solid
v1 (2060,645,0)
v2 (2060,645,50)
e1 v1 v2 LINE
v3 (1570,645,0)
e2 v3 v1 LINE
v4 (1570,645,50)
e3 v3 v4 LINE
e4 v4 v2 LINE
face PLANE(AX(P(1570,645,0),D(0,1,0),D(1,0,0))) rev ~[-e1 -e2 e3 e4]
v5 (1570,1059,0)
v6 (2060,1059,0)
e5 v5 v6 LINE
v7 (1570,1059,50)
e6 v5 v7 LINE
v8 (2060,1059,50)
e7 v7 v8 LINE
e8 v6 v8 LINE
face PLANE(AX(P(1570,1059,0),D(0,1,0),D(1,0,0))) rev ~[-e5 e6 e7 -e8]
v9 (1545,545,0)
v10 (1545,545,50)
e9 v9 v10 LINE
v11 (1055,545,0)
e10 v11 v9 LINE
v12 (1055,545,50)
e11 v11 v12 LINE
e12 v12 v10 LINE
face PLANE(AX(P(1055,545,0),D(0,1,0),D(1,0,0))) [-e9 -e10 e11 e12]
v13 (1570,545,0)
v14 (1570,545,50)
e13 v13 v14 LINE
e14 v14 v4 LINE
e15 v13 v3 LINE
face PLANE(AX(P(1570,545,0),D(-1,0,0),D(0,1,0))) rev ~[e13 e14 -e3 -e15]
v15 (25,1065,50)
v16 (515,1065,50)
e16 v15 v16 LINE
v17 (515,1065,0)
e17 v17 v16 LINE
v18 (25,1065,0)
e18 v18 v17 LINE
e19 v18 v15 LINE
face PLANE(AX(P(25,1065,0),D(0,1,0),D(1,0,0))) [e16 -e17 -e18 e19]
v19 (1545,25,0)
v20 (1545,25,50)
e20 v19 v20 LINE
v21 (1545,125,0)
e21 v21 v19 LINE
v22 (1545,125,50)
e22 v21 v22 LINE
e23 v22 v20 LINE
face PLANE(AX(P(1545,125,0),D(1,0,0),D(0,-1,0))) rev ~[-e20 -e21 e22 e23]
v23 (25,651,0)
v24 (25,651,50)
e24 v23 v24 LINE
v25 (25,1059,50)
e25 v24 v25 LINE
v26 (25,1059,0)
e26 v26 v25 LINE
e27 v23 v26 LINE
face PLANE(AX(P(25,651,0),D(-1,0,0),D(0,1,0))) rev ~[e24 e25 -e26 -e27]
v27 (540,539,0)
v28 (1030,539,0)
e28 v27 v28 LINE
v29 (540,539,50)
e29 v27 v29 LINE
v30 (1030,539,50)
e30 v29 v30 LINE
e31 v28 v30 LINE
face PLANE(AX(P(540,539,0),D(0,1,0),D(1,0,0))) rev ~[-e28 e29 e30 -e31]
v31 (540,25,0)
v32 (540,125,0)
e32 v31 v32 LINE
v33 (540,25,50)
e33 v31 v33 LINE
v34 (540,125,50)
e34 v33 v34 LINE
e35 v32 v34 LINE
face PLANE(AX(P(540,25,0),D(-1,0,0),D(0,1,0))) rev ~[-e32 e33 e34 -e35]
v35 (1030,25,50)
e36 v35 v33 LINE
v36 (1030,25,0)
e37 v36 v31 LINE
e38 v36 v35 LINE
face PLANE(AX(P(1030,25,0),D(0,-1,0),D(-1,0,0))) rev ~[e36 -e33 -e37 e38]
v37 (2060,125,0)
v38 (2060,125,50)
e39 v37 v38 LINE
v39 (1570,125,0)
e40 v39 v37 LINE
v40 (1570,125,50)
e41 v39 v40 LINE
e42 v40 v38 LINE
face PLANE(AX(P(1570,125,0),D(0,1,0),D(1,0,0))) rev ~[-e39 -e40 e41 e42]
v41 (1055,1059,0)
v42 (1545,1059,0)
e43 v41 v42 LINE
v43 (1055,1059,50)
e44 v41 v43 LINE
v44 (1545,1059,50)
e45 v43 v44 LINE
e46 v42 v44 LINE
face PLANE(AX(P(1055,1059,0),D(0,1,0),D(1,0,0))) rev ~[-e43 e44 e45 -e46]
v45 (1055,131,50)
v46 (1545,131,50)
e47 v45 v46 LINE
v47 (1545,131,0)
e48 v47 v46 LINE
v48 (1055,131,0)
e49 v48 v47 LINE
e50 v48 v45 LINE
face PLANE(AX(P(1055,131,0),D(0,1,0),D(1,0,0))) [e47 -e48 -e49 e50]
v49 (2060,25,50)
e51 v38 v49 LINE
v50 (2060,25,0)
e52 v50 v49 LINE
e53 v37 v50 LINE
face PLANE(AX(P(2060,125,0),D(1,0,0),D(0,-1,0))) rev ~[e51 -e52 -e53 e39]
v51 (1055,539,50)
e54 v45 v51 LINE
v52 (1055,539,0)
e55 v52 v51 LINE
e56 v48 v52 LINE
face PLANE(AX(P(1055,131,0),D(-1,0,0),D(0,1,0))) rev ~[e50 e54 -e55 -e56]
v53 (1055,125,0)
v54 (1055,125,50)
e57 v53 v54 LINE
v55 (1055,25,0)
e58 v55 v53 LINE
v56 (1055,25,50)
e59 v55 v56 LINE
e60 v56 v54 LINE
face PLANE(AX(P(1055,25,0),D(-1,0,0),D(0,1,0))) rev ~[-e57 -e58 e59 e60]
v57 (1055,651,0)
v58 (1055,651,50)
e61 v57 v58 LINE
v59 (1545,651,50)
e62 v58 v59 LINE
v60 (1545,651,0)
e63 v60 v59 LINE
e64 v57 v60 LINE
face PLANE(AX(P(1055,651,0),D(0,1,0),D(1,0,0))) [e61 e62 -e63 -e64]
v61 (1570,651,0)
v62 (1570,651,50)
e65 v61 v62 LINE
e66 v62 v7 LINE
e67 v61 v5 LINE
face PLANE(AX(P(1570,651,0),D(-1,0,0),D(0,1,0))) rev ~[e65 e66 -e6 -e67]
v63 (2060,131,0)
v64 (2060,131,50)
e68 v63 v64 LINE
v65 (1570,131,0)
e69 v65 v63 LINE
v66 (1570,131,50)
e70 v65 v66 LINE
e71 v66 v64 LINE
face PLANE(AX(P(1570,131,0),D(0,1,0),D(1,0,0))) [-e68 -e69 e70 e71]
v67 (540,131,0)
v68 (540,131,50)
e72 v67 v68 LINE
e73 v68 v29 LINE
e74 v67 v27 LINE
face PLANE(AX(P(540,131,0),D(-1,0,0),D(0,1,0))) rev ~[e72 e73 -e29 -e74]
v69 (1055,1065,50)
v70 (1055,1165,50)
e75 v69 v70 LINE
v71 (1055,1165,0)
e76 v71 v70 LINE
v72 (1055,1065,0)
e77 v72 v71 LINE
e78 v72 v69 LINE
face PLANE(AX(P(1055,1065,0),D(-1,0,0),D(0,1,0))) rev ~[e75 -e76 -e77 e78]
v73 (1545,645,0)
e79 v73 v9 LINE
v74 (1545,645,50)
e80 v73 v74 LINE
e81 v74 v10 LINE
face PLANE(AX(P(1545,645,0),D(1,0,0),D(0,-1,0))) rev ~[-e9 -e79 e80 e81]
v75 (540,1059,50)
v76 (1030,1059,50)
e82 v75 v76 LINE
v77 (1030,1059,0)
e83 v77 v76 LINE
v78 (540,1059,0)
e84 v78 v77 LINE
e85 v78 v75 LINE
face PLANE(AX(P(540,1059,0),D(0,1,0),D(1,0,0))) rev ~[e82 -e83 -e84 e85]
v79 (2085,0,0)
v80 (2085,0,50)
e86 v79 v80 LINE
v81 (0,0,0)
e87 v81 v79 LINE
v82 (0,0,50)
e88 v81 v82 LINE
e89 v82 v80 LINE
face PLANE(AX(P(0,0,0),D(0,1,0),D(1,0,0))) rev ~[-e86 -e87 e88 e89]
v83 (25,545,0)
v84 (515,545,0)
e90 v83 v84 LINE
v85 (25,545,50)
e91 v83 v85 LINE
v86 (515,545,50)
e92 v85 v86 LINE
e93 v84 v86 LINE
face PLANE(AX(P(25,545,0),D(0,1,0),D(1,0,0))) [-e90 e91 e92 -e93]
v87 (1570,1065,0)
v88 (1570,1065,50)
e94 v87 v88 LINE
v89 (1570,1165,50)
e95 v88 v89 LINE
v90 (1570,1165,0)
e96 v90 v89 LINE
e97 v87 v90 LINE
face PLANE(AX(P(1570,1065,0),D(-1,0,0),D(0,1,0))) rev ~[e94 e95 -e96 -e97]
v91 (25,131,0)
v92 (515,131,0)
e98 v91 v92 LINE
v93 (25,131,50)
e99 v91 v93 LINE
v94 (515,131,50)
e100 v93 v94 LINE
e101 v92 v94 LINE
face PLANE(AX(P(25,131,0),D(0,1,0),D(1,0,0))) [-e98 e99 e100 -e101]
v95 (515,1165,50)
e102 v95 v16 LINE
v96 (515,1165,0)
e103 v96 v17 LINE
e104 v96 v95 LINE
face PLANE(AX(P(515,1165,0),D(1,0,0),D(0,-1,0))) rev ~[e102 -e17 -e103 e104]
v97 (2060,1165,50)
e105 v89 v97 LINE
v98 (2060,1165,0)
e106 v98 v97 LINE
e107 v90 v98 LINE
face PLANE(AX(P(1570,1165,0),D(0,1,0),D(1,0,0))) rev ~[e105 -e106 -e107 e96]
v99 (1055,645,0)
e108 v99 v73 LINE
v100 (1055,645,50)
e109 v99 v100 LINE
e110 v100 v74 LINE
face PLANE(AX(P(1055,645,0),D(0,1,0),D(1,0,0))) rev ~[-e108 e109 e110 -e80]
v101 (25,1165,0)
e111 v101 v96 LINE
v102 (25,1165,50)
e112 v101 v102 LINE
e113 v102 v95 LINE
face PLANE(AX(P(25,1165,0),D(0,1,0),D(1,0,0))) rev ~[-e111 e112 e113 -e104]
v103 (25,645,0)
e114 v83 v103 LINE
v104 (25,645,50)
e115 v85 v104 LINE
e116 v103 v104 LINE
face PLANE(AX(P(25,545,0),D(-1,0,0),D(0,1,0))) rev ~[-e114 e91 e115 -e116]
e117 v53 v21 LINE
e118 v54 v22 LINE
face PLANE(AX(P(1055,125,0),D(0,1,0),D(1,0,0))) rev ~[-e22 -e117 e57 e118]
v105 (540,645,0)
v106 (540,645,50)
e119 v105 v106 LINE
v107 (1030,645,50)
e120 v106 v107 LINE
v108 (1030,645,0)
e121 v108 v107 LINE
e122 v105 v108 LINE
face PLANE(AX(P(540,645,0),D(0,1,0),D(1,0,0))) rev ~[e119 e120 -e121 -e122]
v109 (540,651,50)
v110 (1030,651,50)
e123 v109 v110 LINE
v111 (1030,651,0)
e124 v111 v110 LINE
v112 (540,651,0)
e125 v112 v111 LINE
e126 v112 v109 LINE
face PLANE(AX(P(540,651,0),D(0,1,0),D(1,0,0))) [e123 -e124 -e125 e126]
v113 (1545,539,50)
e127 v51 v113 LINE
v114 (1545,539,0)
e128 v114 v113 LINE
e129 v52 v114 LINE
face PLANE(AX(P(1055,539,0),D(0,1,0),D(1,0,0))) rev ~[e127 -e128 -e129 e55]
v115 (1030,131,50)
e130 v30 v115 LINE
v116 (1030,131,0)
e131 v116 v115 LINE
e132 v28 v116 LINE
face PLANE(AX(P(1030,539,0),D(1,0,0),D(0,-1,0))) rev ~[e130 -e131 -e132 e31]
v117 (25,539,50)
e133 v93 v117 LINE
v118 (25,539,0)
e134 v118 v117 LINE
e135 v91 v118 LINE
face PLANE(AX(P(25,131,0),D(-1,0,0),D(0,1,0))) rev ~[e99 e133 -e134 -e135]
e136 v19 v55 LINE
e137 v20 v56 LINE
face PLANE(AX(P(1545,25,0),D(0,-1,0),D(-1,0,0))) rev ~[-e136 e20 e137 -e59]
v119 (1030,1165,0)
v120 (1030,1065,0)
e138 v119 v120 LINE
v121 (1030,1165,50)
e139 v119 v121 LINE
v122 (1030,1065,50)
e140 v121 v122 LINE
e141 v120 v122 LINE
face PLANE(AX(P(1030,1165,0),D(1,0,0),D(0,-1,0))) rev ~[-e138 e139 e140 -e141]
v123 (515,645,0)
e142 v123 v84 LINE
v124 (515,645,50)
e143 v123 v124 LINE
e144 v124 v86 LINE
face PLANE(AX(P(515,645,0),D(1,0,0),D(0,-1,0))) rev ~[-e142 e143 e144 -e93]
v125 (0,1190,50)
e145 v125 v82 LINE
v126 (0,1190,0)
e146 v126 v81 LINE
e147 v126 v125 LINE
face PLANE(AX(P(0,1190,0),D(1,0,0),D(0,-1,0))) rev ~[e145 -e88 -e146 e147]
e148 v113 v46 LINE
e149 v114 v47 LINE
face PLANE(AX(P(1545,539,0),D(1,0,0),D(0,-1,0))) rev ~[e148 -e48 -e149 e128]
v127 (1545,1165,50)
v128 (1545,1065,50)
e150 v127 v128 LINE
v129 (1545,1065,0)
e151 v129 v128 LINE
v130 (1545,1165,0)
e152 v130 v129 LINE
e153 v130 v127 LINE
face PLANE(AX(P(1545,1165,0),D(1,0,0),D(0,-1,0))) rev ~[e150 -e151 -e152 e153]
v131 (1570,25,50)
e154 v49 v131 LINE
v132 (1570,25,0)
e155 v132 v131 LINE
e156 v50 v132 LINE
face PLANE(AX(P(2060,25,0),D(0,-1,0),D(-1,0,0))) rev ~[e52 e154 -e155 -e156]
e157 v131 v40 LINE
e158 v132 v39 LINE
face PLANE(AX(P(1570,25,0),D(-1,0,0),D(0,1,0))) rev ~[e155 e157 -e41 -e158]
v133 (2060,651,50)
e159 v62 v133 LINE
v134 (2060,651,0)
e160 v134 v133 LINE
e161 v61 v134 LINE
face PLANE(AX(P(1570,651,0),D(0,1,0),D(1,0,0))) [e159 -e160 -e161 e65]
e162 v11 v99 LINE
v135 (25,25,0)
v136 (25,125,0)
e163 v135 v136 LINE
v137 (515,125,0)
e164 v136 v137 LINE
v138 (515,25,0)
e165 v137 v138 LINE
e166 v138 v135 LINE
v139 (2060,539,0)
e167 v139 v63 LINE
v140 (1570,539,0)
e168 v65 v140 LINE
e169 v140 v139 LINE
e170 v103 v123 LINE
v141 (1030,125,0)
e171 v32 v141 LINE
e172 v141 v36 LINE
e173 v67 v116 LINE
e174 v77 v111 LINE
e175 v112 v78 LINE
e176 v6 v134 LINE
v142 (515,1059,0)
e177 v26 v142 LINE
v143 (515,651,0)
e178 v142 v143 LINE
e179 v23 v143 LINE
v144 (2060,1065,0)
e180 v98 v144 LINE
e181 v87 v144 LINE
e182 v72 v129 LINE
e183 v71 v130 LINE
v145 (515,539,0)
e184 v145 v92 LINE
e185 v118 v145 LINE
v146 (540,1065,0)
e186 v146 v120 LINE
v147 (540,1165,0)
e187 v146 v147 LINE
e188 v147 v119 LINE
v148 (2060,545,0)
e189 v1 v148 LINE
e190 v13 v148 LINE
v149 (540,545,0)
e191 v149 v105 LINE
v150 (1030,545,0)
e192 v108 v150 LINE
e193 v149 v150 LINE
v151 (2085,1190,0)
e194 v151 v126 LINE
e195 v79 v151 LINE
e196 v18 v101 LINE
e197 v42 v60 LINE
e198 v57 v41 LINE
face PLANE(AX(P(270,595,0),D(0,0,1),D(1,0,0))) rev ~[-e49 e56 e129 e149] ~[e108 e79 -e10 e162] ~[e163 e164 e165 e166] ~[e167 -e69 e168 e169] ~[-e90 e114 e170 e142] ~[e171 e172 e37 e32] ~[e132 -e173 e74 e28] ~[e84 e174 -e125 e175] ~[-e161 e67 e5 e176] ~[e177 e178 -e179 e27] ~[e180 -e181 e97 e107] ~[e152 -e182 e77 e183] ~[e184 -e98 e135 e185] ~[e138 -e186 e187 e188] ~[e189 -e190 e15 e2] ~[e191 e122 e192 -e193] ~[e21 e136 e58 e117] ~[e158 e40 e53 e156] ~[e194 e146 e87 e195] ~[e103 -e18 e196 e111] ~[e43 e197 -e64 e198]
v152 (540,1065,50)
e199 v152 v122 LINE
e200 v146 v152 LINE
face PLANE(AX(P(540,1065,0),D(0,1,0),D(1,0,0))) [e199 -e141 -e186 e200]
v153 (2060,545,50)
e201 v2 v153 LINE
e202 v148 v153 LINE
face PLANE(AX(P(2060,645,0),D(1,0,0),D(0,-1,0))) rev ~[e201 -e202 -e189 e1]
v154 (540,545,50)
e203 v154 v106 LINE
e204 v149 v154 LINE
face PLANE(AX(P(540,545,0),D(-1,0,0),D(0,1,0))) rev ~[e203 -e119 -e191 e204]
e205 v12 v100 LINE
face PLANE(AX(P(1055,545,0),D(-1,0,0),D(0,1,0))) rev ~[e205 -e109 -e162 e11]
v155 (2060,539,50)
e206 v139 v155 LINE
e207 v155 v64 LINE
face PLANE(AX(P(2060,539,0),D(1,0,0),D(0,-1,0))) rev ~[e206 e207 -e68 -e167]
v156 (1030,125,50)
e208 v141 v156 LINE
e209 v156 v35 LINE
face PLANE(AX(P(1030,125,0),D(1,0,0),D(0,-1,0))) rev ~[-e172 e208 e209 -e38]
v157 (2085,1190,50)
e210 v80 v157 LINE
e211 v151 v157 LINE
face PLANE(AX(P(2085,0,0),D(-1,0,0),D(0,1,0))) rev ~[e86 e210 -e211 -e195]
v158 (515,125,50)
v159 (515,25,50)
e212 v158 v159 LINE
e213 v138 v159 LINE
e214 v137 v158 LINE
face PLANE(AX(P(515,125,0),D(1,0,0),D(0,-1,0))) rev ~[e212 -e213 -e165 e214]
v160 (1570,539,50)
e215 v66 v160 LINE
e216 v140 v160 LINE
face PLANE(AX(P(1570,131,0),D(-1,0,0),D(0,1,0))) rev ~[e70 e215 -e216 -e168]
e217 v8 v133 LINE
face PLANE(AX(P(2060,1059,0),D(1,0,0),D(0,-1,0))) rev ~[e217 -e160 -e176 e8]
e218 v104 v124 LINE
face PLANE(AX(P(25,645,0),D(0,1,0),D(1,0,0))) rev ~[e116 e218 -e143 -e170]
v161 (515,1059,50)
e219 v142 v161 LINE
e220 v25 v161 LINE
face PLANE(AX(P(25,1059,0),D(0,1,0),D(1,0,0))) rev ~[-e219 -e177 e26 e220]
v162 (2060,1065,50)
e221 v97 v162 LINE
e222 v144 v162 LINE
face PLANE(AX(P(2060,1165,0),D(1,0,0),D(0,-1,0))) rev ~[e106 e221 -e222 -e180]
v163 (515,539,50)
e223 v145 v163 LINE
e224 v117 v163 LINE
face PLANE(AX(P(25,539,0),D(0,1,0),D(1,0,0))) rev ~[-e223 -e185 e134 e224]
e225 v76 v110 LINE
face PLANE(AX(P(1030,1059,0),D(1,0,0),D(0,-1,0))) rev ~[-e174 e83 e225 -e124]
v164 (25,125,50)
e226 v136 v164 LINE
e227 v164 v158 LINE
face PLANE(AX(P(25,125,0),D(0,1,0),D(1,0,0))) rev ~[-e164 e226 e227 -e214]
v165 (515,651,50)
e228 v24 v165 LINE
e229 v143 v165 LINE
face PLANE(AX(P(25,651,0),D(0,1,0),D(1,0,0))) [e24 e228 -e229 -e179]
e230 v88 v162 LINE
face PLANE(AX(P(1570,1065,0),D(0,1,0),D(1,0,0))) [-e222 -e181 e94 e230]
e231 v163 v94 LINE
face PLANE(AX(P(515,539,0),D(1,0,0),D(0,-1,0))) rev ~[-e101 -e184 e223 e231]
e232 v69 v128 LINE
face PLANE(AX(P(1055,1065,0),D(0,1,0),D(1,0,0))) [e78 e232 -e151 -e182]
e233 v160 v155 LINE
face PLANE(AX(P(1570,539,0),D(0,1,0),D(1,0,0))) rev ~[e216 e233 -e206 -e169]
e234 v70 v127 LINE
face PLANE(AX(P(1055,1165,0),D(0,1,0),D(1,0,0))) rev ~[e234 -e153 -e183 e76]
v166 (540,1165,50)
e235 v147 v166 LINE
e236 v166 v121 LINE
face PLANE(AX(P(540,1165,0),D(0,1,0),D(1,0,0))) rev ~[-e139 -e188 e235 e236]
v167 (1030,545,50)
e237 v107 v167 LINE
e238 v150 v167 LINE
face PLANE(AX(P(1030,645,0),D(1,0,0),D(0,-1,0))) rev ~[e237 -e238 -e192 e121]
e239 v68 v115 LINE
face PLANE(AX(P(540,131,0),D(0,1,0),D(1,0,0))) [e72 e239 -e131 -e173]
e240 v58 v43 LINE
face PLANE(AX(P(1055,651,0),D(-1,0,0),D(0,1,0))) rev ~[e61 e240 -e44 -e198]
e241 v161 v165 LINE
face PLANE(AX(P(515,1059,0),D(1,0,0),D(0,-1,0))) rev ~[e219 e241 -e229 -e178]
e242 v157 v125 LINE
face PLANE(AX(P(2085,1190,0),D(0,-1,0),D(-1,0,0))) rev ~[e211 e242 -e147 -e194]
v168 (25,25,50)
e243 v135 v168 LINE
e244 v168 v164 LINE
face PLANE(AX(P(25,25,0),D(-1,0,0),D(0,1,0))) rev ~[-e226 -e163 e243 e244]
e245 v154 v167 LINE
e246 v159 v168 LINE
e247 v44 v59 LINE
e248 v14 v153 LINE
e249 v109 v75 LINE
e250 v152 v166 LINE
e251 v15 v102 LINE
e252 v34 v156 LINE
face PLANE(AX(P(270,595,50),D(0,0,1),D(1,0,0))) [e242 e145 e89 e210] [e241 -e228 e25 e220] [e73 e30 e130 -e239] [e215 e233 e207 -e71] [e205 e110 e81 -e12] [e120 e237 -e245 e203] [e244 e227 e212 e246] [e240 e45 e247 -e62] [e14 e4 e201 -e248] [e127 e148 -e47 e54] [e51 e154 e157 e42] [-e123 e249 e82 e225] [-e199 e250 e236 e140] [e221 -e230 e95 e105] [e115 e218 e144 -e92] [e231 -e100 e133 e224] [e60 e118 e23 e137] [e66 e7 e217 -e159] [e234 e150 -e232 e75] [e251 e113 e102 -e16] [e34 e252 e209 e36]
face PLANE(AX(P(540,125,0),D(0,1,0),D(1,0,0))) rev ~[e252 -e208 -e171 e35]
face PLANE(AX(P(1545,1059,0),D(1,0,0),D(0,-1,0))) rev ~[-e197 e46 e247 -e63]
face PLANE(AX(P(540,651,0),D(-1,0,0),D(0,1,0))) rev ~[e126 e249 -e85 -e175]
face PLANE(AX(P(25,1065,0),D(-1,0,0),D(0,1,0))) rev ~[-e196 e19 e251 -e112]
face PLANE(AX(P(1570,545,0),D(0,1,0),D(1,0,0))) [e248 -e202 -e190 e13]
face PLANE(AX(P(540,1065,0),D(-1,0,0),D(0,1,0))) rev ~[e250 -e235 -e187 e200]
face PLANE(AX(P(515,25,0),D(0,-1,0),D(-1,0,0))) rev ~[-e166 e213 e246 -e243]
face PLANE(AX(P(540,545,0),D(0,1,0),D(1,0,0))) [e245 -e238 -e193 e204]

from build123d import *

# Parameters (mm, degrees)
F0_W     = 490
F0_H     = 6
F1_DEPTH = 50


# Not quite as in the source:
# - a feature names something its author has since deleted; it is built from what else it names
# - the program builds the solid bodies; features that only make, move or delete a surface that nothing else refers to are left out


with BuildPart() as f1:
    # F0 (on Top) → F1 (new body)
    with BuildSketch(Plane.XY):
        Polygon((0, 1190), (0, 0), (515, 0), (540, 0), (540, 25), (540, 125), (540, 131), (540, 539), (540, 545), (540, 645), (540, 651), (540, 1059), (540, 1065), (540, 1165), (540, 1190), (515, 1190), align=None)
        Polygon((25, 1065), (25, 1165), (515, 1165), (515, 1065), (515, 1059), (515, 651), (515, 645), (515, 545), (515, 539), (515, 131), (515, 125), (515, 25), (25, 25), (25, 125), (25, 131), (25, 539), (25, 545), (25, 645), (25, 651), (25, 1059), align=None, mode=Mode.SUBTRACT)
        Polygon((540, 25), (540, 0), (1030, 0), (1055, 0), (1055, 25), (1055, 125), (1055, 131), (1055, 539), (1055, 545), (1055, 645), (1055, 651), (1055, 1059), (1055, 1065), (1055, 1165), (1055, 1190), (1030, 1190), (540, 1190), (540, 1165), (1030, 1165), (1030, 1065), (1030, 1059), (1030, 651), (1030, 645), (1030, 545), (1030, 539), (1030, 131), (1030, 125), (1030, 25), align=None)
        Polygon((1055, 25), (1055, 0), (1545, 0), (1570, 0), (1570, 25), (1570, 125), (1570, 131), (1570, 539), (1570, 545), (1570, 645), (1570, 651), (1570, 1059), (1570, 1065), (1570, 1165), (1570, 1190), (1545, 1190), (1055, 1190), (1055, 1165), (1545, 1165), (1545, 1065), (1545, 1059), (1545, 651), (1545, 645), (1545, 545), (1545, 539), (1545, 131), (1545, 125), (1545, 25), align=None)
        Polygon((1570, 25), (1570, 0), (2085, 0), (2085, 1190), (1570, 1190), (1570, 1165), (2060, 1165), (2060, 1065), (2060, 1059), (2060, 651), (2060, 645), (2060, 545), (2060, 539), (2060, 131), (2060, 125), (2060, 25), align=None)
        with Locations((270, 542)):
            Rectangle(F0_W, F0_H)
        with Locations((270, 128)):
            Rectangle(F0_W, F0_H)
        with Locations((270, 648)):
            Rectangle(F0_W, F0_H)
        with Locations((270, 1062)):
            Rectangle(F0_W, F0_H)
        with Locations((785, 648)):
            Rectangle(F0_W, F0_H)
        with Locations((1300, 648)):
            Rectangle(F0_W, F0_H)
        with Locations((1300, 542)):
            Rectangle(F0_W, F0_H)
        with Locations((785, 542)):
            Rectangle(F0_W, F0_H)
        with Locations((1815, 542)):
            Rectangle(F0_W, F0_H)
        with Locations((1815, 648)):
            Rectangle(F0_W, F0_H)
        with Locations((1815, 1062)):
            Rectangle(F0_W, F0_H)
        with Locations((1300, 1062)):
            Rectangle(F0_W, F0_H)
        with Locations((785, 1062)):
            Rectangle(F0_W, F0_H)
        with Locations((1815, 128)):
            Rectangle(F0_W, F0_H)
        with Locations((785, 128)):
            Rectangle(F0_W, F0_H)
        with Locations((1300, 128)):
            Rectangle(F0_W, F0_H)
    extrude(amount=F1_DEPTH)


solid = f1.part
